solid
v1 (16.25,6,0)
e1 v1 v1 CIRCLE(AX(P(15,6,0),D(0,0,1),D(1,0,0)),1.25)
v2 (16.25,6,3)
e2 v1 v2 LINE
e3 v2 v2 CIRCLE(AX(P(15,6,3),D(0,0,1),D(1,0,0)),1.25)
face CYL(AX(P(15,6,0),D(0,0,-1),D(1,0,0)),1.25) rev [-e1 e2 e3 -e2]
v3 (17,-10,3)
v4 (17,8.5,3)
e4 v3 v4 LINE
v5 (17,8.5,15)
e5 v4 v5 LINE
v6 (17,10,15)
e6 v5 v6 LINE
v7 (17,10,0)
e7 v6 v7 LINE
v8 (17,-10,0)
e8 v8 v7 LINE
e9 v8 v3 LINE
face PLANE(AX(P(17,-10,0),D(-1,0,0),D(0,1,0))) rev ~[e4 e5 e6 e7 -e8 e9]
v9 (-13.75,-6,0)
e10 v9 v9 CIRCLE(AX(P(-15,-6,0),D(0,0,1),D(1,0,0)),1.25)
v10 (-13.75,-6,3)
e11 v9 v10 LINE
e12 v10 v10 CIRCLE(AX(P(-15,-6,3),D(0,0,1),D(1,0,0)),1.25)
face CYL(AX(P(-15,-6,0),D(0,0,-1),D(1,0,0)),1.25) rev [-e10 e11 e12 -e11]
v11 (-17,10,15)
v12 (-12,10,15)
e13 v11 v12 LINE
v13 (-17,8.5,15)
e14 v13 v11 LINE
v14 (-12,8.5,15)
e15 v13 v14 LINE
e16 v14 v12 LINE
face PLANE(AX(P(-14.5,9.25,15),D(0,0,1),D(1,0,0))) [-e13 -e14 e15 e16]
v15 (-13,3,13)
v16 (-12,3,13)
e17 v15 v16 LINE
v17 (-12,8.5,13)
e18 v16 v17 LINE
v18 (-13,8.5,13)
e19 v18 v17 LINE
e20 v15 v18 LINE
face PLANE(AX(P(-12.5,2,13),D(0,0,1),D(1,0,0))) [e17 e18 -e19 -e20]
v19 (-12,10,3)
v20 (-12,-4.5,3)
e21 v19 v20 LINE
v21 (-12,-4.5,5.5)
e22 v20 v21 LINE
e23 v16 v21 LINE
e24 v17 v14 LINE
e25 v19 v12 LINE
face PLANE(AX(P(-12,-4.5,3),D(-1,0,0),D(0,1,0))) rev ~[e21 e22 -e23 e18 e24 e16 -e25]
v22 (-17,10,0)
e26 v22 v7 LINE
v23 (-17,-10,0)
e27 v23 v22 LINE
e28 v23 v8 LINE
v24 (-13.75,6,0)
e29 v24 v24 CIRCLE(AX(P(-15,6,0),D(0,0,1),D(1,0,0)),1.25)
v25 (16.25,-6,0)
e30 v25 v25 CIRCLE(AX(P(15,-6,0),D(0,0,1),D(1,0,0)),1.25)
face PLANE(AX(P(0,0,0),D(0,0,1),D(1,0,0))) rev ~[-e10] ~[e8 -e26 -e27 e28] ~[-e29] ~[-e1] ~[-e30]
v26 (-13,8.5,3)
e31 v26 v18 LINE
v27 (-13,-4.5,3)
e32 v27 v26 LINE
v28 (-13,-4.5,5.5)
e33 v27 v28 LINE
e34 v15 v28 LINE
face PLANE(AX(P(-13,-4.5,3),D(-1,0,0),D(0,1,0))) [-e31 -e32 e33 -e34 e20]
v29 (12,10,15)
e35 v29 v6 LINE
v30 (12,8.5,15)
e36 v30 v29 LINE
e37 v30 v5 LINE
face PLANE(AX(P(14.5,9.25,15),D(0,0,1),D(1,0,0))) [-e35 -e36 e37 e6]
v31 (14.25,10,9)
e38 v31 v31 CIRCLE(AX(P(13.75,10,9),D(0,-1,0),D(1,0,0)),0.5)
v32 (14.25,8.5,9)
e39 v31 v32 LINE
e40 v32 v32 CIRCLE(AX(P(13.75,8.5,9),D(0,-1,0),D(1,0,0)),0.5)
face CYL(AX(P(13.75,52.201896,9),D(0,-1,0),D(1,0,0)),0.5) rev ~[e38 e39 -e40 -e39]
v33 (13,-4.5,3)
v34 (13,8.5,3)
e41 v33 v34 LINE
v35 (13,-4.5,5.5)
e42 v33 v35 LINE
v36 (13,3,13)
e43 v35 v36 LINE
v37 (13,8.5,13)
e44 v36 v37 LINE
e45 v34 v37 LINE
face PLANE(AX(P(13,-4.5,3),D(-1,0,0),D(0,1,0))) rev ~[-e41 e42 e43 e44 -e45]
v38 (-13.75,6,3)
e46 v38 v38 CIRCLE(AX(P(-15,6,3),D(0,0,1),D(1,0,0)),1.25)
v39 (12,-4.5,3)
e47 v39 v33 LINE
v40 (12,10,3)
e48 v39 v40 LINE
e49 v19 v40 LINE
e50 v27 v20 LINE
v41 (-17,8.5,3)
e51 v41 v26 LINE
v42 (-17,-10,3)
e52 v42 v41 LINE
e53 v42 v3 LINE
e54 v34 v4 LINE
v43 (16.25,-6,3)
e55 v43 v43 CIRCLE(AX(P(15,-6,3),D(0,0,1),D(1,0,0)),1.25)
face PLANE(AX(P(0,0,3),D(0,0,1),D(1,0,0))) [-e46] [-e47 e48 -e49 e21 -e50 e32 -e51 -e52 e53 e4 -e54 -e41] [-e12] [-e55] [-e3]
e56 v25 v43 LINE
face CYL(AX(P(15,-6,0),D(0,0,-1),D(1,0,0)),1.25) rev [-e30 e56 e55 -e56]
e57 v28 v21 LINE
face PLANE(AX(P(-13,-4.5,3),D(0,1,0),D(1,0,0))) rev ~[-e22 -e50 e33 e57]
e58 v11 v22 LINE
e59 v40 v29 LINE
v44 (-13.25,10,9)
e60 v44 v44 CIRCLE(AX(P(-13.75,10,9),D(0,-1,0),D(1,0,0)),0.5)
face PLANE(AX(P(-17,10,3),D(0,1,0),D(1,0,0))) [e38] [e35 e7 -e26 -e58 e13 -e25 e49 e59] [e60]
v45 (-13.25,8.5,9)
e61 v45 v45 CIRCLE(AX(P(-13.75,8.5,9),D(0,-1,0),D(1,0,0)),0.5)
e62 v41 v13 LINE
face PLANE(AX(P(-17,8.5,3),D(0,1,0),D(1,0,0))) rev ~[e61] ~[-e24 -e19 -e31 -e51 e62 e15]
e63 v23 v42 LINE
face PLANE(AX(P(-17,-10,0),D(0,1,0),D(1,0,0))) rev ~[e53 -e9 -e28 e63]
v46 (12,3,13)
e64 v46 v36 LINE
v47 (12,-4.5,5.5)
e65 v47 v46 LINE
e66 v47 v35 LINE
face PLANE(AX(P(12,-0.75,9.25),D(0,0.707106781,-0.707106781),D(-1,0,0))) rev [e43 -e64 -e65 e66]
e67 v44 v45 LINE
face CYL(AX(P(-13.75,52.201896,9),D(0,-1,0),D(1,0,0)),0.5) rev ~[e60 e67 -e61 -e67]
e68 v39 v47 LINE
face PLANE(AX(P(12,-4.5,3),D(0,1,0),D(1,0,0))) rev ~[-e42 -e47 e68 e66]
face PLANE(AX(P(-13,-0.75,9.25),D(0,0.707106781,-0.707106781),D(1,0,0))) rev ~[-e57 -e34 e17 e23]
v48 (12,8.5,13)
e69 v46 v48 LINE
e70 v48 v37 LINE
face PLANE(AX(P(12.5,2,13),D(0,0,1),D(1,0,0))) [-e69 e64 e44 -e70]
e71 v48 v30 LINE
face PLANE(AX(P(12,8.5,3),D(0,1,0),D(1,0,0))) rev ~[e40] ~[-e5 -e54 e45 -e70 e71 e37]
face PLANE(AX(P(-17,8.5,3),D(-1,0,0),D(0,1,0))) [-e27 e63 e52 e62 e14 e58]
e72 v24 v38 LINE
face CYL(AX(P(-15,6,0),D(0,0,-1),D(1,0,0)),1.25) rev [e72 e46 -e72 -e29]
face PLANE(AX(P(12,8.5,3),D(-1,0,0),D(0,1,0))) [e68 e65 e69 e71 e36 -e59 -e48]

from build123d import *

# Parameters (mm, degrees)
F0_W     = 34
F0_H     = 20
F0_R     = 1.25
F1_DEPTH = 3
F2_W     = 5
F2_H     = 1.5
F3_DEPTH = 12
F4_W     = 1
F4_H     = 13
F5_DEPTH = 10
F6_SIZE  = 7.5
F8_D     = 1


# Not quite as in the source:
# - a feature names something its author has since deleted; it is built from what else it names


with BuildPart() as f1:
    # F0 (on Top) → F1 (new body)
    with BuildSketch(Plane.XY):
        Rectangle(F0_W, F0_H)
        with Locations((-15, -6)):
            Circle(F0_R, mode=Mode.SUBTRACT)
        with Locations((15, -6)):
            Circle(F0_R, mode=Mode.SUBTRACT)
        with Locations((-15, 6)):
            Circle(F0_R, mode=Mode.SUBTRACT)
        with Locations((15, 6)):
            Circle(F0_R, mode=Mode.SUBTRACT)
    extrude(amount=F1_DEPTH)

    # F2 (on face) → F3 (join)
    with BuildSketch(Plane.XY.offset(3)):
        with Locations((-14.5, 9.25)):
            Rectangle(F2_W, F2_H)
        with Locations((14.5, 9.25)):
            Rectangle(F2_W, F2_H)
    extrude(amount=F3_DEPTH)

    # F4 (on face) → F5 (join)
    with BuildSketch(Plane.XY.offset(3)):
        with Locations((-12.5, 2)):
            Rectangle(F4_W, F4_H)
        with Locations((12.5, 2)):
            Rectangle(F4_W, F4_H)
    extrude(amount=F5_DEPTH)

    # F6
    f6_edges = [f1.edges().sort_by_distance(p)[0] for p in [
        (-12.5, -4.5, 13),
        (12.5, -4.5, 13),
    ]]
    chamfer(f6_edges, length=F6_SIZE)

    # F8 (through all)
    with Locations(Plane(origin=(0, 10, 0), x_dir=(-1, 0, 0), z_dir=(0, 1, 0))):
        with Locations((13.75, 9), (-13.75, 9)):
            Hole(F8_D / 2)


solid = f1.part
